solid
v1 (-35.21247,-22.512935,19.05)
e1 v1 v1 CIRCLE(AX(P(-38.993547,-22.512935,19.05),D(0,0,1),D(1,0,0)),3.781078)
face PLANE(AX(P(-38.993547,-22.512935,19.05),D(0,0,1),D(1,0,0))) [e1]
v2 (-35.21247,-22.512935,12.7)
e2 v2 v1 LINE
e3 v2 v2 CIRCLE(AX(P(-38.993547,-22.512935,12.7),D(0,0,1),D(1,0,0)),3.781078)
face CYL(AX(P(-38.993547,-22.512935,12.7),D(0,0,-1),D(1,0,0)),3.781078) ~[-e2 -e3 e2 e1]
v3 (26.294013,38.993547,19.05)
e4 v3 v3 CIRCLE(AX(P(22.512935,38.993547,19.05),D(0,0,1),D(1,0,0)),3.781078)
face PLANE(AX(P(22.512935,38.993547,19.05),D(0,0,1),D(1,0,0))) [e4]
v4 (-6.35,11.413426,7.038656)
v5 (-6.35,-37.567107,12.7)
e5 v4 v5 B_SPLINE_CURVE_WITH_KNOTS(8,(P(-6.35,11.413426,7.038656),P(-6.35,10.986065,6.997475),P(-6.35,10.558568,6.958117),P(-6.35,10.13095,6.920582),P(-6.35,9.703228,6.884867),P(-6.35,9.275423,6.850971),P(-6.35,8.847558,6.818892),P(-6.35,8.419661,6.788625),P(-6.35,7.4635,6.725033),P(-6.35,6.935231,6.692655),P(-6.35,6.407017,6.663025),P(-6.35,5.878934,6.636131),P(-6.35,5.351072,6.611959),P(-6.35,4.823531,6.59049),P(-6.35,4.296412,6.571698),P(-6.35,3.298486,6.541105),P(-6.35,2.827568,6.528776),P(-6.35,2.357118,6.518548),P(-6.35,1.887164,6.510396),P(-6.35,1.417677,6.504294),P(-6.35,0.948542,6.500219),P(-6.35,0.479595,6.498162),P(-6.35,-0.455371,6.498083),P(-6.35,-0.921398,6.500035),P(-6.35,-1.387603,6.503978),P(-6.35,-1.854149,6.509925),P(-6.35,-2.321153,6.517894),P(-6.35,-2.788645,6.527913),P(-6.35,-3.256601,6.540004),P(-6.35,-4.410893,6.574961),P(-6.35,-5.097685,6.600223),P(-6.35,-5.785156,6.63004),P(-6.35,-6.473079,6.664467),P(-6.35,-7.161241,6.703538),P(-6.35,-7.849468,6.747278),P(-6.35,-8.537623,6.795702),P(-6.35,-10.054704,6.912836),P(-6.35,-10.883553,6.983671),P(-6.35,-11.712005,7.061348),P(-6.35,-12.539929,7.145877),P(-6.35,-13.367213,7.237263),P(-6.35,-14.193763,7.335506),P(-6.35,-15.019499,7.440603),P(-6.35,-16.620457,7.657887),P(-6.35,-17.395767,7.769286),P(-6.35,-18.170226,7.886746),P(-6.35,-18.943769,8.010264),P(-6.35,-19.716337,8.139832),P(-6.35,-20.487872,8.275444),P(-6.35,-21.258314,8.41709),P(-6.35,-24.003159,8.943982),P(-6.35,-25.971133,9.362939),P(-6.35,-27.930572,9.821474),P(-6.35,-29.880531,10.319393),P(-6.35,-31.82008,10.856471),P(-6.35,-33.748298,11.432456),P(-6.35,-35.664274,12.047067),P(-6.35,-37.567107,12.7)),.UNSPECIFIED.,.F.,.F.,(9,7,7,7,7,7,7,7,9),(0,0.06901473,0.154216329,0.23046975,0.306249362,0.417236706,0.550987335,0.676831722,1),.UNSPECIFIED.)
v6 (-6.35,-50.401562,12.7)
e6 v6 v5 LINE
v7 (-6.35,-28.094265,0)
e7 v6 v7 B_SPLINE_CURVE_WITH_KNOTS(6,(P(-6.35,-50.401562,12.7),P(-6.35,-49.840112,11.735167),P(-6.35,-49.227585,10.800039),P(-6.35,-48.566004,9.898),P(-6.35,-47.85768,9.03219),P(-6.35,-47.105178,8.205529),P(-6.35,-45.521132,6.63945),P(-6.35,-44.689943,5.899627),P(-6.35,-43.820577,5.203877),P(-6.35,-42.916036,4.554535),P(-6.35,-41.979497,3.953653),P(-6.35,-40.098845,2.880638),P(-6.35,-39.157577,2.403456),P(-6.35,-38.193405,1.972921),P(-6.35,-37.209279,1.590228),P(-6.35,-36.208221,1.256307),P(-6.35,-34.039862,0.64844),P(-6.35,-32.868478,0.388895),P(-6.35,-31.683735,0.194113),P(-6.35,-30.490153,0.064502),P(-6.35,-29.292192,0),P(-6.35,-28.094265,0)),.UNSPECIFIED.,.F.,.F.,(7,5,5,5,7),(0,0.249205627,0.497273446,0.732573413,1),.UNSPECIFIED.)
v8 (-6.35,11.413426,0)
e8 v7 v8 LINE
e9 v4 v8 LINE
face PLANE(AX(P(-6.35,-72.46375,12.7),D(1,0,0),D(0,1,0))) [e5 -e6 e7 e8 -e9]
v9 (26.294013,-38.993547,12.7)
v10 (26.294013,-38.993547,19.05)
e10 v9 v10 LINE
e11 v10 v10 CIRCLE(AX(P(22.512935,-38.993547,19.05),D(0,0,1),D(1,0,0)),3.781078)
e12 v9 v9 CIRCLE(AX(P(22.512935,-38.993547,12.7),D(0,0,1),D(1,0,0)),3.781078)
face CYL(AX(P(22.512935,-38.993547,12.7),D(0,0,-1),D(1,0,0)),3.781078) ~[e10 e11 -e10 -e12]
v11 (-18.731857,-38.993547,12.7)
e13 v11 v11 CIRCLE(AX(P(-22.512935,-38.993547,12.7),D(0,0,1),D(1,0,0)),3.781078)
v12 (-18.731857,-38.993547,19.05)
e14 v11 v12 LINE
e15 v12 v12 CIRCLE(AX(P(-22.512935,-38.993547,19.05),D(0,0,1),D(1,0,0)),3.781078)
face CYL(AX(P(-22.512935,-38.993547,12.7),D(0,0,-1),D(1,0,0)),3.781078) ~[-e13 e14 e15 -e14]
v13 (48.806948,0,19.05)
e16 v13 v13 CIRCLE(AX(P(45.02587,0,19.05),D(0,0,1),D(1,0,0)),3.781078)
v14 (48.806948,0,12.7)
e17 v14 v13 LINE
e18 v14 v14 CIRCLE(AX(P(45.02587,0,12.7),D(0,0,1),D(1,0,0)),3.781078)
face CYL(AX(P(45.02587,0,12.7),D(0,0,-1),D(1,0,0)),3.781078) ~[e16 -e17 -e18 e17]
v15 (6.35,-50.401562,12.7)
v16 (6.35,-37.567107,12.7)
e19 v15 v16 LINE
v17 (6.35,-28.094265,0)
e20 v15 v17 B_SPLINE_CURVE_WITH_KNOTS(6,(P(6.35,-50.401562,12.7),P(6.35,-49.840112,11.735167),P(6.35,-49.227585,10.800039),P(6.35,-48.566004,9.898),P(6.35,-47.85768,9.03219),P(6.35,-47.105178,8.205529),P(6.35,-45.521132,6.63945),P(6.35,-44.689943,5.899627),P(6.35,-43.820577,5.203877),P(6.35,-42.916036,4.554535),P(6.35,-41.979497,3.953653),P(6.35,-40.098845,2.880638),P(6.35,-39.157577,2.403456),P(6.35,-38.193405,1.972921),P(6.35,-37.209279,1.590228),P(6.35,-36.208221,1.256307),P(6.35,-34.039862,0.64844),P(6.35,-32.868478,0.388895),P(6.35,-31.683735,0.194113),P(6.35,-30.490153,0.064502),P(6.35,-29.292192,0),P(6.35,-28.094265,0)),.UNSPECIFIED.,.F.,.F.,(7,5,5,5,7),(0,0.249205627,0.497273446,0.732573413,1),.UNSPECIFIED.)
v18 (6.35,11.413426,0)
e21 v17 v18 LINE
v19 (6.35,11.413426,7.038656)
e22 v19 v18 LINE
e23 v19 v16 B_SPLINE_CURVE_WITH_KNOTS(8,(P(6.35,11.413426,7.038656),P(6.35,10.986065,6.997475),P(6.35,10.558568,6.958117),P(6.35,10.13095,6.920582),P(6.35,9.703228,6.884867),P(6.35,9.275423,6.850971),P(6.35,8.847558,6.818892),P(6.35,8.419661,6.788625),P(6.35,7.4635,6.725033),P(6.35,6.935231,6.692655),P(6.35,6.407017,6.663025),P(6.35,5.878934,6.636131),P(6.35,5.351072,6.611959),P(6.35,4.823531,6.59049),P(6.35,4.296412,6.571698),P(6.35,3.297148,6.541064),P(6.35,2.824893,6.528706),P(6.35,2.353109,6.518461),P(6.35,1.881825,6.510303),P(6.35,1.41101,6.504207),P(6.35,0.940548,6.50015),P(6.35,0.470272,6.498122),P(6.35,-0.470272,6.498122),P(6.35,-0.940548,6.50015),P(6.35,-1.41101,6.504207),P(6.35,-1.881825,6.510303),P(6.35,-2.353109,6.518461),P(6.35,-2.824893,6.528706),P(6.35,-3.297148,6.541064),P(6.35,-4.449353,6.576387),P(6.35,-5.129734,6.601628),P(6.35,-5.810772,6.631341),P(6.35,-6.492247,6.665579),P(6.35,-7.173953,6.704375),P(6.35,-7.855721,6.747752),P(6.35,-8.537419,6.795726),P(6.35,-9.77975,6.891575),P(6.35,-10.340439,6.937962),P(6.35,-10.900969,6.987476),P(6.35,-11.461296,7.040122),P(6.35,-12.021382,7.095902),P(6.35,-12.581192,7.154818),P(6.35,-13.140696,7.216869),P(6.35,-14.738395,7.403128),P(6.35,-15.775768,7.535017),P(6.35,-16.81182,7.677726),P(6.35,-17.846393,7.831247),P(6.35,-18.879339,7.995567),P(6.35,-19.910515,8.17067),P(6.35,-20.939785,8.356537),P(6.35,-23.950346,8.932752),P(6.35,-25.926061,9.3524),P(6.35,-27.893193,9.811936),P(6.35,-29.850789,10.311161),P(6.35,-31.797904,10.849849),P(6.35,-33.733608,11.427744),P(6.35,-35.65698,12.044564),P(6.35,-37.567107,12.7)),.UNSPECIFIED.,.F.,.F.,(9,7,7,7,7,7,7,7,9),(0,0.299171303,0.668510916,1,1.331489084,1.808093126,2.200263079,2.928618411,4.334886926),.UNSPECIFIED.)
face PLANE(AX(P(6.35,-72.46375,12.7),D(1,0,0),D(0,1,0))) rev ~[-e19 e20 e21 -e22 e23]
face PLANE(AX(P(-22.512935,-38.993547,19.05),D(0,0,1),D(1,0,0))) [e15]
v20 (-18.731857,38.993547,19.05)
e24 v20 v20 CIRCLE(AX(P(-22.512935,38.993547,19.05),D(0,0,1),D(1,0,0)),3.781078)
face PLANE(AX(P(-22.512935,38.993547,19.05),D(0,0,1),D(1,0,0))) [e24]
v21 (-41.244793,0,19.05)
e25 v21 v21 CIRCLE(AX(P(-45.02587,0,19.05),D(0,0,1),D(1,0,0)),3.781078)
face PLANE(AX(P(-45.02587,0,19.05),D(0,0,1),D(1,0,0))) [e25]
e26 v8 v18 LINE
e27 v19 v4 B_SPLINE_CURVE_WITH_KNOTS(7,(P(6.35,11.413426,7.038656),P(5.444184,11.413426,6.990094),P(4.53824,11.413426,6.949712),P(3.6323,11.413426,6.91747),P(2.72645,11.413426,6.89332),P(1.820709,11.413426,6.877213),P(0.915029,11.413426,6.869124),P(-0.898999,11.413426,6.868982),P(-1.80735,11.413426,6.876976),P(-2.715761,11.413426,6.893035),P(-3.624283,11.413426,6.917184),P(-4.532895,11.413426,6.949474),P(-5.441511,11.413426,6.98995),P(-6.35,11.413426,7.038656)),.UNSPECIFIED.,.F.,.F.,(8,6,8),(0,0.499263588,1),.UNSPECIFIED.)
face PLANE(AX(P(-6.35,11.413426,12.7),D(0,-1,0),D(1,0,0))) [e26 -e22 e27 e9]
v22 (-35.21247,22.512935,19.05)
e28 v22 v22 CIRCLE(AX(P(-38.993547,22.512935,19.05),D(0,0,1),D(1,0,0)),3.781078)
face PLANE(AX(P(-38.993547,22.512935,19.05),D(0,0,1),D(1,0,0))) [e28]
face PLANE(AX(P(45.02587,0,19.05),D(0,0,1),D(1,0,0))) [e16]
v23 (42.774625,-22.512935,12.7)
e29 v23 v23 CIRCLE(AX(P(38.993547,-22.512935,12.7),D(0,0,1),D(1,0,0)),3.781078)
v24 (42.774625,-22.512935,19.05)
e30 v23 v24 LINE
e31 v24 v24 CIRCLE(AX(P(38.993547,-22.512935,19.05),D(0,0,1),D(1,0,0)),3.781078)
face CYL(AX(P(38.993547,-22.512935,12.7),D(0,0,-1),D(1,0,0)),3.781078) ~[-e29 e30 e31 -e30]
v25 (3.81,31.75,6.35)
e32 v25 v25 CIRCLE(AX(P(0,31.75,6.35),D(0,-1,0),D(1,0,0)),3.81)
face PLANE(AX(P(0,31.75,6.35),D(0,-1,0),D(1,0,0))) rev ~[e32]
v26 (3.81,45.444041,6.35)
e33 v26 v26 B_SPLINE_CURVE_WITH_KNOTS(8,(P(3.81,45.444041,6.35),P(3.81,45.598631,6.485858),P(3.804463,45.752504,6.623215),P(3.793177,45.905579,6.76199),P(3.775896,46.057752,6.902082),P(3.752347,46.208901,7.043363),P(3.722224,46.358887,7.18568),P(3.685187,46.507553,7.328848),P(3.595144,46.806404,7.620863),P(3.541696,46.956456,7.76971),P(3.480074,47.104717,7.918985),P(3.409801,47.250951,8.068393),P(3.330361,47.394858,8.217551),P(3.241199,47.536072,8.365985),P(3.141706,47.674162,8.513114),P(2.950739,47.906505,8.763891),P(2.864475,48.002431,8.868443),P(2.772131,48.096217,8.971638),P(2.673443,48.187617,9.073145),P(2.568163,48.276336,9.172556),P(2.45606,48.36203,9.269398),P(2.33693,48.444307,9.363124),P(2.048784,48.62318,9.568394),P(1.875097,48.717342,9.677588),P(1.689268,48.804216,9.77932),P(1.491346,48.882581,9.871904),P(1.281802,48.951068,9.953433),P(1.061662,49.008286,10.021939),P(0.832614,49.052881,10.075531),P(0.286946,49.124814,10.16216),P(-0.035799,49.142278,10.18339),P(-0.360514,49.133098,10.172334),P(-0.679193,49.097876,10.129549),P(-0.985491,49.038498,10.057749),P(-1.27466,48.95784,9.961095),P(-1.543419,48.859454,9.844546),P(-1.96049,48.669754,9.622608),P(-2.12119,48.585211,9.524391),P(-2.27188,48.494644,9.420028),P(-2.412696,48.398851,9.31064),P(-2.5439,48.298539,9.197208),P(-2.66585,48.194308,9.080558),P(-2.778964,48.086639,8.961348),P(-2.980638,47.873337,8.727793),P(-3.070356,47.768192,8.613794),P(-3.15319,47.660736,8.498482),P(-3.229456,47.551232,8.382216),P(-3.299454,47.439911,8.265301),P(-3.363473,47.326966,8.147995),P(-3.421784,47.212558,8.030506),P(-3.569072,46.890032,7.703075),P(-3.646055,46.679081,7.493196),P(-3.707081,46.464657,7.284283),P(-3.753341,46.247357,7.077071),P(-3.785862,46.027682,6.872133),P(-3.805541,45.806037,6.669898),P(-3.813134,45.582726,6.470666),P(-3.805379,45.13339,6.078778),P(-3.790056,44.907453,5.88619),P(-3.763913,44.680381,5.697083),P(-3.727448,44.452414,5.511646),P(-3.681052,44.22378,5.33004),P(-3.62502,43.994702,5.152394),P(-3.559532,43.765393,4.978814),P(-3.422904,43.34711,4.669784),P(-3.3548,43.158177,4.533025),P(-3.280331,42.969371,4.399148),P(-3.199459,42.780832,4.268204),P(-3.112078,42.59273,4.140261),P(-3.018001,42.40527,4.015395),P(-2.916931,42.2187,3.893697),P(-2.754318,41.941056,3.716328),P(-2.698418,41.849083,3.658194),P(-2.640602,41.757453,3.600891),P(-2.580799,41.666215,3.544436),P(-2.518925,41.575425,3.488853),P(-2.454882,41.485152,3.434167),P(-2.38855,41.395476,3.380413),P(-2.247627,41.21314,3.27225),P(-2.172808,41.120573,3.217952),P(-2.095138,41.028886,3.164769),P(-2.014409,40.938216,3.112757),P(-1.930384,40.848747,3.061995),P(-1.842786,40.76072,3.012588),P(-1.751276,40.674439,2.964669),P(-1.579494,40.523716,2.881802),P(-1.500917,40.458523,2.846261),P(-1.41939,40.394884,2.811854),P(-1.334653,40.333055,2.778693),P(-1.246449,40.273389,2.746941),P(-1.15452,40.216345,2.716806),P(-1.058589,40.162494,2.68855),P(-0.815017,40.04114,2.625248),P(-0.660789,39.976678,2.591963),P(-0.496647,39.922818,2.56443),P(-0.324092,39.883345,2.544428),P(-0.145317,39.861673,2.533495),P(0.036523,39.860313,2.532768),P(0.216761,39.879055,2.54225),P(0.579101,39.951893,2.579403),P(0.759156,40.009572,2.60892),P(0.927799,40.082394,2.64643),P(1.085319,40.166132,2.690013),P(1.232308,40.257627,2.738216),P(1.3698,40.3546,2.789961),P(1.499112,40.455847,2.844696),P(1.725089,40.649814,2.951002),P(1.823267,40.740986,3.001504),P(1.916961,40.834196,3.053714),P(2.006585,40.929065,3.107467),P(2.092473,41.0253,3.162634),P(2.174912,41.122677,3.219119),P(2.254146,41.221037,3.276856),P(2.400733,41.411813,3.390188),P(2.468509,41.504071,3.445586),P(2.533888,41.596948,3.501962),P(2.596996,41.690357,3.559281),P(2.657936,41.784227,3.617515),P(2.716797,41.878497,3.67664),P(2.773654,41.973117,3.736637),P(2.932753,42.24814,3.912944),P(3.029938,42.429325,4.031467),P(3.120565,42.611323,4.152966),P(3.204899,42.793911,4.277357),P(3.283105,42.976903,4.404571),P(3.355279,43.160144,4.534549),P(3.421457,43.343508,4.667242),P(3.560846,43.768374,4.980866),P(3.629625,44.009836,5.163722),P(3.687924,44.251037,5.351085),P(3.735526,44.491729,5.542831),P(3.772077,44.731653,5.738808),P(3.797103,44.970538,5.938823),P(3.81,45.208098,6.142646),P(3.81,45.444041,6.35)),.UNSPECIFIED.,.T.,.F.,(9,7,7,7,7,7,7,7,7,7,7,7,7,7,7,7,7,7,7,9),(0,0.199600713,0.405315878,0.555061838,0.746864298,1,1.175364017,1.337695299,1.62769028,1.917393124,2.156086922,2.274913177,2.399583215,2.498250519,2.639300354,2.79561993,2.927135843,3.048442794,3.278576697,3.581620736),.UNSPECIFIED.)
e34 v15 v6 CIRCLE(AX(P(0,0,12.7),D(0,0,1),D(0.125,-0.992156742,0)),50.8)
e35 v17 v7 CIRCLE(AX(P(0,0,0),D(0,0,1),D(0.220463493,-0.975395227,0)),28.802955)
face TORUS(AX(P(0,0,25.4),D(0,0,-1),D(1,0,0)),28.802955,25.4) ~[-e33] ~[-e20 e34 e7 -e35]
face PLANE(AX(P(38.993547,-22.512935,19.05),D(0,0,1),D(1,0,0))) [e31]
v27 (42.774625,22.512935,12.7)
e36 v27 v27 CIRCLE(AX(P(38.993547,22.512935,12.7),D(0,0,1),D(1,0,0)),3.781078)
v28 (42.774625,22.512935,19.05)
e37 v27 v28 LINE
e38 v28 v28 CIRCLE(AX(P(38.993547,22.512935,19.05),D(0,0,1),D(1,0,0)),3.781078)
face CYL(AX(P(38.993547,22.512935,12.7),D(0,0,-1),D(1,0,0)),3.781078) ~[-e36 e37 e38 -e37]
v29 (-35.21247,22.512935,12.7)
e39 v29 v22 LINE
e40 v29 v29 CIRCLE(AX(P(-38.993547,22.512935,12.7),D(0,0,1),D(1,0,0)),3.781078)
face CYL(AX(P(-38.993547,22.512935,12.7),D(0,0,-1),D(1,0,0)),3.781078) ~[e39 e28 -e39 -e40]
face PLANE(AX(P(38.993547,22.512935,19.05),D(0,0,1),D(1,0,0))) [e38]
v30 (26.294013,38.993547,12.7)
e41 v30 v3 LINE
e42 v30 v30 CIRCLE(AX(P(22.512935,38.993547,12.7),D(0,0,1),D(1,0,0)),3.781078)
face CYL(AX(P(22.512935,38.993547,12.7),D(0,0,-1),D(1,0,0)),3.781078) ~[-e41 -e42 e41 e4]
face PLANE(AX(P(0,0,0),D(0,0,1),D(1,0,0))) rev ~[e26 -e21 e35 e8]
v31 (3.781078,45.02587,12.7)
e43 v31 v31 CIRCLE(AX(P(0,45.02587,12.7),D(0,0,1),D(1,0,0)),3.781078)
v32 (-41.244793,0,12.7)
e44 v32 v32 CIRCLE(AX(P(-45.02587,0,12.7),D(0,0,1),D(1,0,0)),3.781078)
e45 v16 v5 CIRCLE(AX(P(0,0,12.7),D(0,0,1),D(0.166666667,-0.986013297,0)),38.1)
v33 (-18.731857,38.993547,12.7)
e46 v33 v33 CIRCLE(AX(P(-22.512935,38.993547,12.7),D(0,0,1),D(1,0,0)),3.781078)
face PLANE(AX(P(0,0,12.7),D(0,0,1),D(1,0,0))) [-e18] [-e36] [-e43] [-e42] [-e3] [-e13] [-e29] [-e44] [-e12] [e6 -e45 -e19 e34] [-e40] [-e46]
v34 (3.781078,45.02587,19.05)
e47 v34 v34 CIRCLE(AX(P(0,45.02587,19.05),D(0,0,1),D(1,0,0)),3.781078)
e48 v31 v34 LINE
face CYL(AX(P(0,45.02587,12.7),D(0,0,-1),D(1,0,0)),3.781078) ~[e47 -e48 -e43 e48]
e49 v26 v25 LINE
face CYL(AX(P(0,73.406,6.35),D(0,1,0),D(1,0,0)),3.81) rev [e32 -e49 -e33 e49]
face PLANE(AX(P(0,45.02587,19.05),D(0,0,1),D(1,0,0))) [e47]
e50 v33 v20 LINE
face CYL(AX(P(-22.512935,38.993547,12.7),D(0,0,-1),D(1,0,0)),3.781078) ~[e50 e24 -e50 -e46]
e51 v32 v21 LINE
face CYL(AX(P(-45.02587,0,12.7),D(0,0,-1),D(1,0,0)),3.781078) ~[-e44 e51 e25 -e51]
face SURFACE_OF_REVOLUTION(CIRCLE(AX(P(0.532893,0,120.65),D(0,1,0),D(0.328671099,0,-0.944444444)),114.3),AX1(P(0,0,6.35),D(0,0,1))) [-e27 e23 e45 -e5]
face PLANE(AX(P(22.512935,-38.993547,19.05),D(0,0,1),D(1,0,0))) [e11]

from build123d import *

# Parameters (mm, degrees)
F0_R      = 50.8
F1_DEPTH  = 12.7
F3_R      = 38.1
F4_DEPTH  = 6.35
F6_W      = 12.7
F6_H      = 83.8771756418
F7_DEPTH  = 25.4
F9_R      = 3.81
F10_DEPTH = 41.656
F11_R     = 3.7810776449
F12_DEPTH = 6.35


# Not quite as in the source:
# - a fillet or chamfer that OpenCascade refuses, or shapes differently, is made with other operations: its cross-section is extruded or revolved along the edge and cut away or added


with BuildPart() as f1:
    # F0 (on Top) → F1 (new body)
    with BuildSketch(Plane.XY):
        Circle(F0_R)
    extrude(amount=F1_DEPTH)

    # F2: fillet of radius 25.4 on 1 edges, made by hand

    # F2_s1 → F2_t2 (revolve, cut)
    with BuildSketch(Plane.XZ):
        with BuildLine():
            ThreePointArc((50.8, 12.7), (41.5029547439, 3.4029547439), (28.8029547439, 0))
            Line((28.8029547439, 0), (28.8029547439, -0.508))
            Line((28.8029547439, -0.508), (50.8, -0.508))
            Line((50.8, -0.508), (51.308, 0))
            ThreePointArc((51.308, 0), (51.308, 6.35), (51.2399409051, 12.446))
            Line((51.2399409051, 12.446), (50.8, 12.7))
        make_face()
    revolve(axis=Axis((0, 0, 0), (0, 0, 1)), mode=Mode.SUBTRACT)

    # F3 (on face) → F4 (cut)
    with BuildSketch(Plane.XY.offset(12.7)):
        Circle(F3_R)
    extrude(amount=-F4_DEPTH, mode=Mode.SUBTRACT)

    # F5: fillet of radius 114.3 on 1 edges, made by hand

    # F5_s1 → F5_t2 (revolve)
    with BuildSketch(Plane.XZ):
        with BuildLine():
            ThreePointArc((38.1, 12.7), (19.5828933773, 7.948680132), (0.5328933773, 6.35))
            Line((0.5328933773, 6.35), (38.1, 6.35))
            Line((38.1, 6.35), (38.1, 12.7))
        make_face()
    revolve(axis=Axis((0, 0, 6.35), (0, 0, 1)))

    # F6 (on face) → F7 (cut)
    with BuildSketch(Plane.XY.offset(12.7)):
        with Locations((0, -30.5251618847)):
            Rectangle(F6_W, F6_H)
    extrude(amount=-F7_DEPTH, mode=Mode.SUBTRACT)

    # F9 (on offset) → F10 (cut)
    with BuildSketch(Plane.XZ.offset(-73.406)):
        with Locations((0, 6.35)):
            Circle(F9_R)
    extrude(amount=F10_DEPTH, mode=Mode.SUBTRACT)

    # F11 (on face) → F12 (join)
    with BuildSketch(Plane.XY.offset(12.7)):
        with Locations((-45.025870204, 0)):
            Circle(F11_R)
        with Locations((-38.9935474241, -22.512935102)):
            Circle(F11_R)
        with Locations((-22.512935102, -38.9935474241)):
            Circle(F11_R)
        with Locations((22.512935102, -38.9935474241)):
            Circle(F11_R)
        with Locations((38.9935474241, -22.512935102)):
            Circle(F11_R)
        with Locations((45.025870204, 0)):
            Circle(F11_R)
        with Locations((38.9935474241, 22.512935102)):
            Circle(F11_R)
        with Locations((22.512935102, 38.9935474241)):
            Circle(F11_R)
        with Locations((0, 45.025870204)):
            Circle(F11_R)
        with Locations((-22.512935102, 38.9935474241)):
            Circle(F11_R)
        with Locations((-38.9935474241, 22.512935102)):
            Circle(F11_R)
    extrude(amount=F12_DEPTH)


solid = f1.part
